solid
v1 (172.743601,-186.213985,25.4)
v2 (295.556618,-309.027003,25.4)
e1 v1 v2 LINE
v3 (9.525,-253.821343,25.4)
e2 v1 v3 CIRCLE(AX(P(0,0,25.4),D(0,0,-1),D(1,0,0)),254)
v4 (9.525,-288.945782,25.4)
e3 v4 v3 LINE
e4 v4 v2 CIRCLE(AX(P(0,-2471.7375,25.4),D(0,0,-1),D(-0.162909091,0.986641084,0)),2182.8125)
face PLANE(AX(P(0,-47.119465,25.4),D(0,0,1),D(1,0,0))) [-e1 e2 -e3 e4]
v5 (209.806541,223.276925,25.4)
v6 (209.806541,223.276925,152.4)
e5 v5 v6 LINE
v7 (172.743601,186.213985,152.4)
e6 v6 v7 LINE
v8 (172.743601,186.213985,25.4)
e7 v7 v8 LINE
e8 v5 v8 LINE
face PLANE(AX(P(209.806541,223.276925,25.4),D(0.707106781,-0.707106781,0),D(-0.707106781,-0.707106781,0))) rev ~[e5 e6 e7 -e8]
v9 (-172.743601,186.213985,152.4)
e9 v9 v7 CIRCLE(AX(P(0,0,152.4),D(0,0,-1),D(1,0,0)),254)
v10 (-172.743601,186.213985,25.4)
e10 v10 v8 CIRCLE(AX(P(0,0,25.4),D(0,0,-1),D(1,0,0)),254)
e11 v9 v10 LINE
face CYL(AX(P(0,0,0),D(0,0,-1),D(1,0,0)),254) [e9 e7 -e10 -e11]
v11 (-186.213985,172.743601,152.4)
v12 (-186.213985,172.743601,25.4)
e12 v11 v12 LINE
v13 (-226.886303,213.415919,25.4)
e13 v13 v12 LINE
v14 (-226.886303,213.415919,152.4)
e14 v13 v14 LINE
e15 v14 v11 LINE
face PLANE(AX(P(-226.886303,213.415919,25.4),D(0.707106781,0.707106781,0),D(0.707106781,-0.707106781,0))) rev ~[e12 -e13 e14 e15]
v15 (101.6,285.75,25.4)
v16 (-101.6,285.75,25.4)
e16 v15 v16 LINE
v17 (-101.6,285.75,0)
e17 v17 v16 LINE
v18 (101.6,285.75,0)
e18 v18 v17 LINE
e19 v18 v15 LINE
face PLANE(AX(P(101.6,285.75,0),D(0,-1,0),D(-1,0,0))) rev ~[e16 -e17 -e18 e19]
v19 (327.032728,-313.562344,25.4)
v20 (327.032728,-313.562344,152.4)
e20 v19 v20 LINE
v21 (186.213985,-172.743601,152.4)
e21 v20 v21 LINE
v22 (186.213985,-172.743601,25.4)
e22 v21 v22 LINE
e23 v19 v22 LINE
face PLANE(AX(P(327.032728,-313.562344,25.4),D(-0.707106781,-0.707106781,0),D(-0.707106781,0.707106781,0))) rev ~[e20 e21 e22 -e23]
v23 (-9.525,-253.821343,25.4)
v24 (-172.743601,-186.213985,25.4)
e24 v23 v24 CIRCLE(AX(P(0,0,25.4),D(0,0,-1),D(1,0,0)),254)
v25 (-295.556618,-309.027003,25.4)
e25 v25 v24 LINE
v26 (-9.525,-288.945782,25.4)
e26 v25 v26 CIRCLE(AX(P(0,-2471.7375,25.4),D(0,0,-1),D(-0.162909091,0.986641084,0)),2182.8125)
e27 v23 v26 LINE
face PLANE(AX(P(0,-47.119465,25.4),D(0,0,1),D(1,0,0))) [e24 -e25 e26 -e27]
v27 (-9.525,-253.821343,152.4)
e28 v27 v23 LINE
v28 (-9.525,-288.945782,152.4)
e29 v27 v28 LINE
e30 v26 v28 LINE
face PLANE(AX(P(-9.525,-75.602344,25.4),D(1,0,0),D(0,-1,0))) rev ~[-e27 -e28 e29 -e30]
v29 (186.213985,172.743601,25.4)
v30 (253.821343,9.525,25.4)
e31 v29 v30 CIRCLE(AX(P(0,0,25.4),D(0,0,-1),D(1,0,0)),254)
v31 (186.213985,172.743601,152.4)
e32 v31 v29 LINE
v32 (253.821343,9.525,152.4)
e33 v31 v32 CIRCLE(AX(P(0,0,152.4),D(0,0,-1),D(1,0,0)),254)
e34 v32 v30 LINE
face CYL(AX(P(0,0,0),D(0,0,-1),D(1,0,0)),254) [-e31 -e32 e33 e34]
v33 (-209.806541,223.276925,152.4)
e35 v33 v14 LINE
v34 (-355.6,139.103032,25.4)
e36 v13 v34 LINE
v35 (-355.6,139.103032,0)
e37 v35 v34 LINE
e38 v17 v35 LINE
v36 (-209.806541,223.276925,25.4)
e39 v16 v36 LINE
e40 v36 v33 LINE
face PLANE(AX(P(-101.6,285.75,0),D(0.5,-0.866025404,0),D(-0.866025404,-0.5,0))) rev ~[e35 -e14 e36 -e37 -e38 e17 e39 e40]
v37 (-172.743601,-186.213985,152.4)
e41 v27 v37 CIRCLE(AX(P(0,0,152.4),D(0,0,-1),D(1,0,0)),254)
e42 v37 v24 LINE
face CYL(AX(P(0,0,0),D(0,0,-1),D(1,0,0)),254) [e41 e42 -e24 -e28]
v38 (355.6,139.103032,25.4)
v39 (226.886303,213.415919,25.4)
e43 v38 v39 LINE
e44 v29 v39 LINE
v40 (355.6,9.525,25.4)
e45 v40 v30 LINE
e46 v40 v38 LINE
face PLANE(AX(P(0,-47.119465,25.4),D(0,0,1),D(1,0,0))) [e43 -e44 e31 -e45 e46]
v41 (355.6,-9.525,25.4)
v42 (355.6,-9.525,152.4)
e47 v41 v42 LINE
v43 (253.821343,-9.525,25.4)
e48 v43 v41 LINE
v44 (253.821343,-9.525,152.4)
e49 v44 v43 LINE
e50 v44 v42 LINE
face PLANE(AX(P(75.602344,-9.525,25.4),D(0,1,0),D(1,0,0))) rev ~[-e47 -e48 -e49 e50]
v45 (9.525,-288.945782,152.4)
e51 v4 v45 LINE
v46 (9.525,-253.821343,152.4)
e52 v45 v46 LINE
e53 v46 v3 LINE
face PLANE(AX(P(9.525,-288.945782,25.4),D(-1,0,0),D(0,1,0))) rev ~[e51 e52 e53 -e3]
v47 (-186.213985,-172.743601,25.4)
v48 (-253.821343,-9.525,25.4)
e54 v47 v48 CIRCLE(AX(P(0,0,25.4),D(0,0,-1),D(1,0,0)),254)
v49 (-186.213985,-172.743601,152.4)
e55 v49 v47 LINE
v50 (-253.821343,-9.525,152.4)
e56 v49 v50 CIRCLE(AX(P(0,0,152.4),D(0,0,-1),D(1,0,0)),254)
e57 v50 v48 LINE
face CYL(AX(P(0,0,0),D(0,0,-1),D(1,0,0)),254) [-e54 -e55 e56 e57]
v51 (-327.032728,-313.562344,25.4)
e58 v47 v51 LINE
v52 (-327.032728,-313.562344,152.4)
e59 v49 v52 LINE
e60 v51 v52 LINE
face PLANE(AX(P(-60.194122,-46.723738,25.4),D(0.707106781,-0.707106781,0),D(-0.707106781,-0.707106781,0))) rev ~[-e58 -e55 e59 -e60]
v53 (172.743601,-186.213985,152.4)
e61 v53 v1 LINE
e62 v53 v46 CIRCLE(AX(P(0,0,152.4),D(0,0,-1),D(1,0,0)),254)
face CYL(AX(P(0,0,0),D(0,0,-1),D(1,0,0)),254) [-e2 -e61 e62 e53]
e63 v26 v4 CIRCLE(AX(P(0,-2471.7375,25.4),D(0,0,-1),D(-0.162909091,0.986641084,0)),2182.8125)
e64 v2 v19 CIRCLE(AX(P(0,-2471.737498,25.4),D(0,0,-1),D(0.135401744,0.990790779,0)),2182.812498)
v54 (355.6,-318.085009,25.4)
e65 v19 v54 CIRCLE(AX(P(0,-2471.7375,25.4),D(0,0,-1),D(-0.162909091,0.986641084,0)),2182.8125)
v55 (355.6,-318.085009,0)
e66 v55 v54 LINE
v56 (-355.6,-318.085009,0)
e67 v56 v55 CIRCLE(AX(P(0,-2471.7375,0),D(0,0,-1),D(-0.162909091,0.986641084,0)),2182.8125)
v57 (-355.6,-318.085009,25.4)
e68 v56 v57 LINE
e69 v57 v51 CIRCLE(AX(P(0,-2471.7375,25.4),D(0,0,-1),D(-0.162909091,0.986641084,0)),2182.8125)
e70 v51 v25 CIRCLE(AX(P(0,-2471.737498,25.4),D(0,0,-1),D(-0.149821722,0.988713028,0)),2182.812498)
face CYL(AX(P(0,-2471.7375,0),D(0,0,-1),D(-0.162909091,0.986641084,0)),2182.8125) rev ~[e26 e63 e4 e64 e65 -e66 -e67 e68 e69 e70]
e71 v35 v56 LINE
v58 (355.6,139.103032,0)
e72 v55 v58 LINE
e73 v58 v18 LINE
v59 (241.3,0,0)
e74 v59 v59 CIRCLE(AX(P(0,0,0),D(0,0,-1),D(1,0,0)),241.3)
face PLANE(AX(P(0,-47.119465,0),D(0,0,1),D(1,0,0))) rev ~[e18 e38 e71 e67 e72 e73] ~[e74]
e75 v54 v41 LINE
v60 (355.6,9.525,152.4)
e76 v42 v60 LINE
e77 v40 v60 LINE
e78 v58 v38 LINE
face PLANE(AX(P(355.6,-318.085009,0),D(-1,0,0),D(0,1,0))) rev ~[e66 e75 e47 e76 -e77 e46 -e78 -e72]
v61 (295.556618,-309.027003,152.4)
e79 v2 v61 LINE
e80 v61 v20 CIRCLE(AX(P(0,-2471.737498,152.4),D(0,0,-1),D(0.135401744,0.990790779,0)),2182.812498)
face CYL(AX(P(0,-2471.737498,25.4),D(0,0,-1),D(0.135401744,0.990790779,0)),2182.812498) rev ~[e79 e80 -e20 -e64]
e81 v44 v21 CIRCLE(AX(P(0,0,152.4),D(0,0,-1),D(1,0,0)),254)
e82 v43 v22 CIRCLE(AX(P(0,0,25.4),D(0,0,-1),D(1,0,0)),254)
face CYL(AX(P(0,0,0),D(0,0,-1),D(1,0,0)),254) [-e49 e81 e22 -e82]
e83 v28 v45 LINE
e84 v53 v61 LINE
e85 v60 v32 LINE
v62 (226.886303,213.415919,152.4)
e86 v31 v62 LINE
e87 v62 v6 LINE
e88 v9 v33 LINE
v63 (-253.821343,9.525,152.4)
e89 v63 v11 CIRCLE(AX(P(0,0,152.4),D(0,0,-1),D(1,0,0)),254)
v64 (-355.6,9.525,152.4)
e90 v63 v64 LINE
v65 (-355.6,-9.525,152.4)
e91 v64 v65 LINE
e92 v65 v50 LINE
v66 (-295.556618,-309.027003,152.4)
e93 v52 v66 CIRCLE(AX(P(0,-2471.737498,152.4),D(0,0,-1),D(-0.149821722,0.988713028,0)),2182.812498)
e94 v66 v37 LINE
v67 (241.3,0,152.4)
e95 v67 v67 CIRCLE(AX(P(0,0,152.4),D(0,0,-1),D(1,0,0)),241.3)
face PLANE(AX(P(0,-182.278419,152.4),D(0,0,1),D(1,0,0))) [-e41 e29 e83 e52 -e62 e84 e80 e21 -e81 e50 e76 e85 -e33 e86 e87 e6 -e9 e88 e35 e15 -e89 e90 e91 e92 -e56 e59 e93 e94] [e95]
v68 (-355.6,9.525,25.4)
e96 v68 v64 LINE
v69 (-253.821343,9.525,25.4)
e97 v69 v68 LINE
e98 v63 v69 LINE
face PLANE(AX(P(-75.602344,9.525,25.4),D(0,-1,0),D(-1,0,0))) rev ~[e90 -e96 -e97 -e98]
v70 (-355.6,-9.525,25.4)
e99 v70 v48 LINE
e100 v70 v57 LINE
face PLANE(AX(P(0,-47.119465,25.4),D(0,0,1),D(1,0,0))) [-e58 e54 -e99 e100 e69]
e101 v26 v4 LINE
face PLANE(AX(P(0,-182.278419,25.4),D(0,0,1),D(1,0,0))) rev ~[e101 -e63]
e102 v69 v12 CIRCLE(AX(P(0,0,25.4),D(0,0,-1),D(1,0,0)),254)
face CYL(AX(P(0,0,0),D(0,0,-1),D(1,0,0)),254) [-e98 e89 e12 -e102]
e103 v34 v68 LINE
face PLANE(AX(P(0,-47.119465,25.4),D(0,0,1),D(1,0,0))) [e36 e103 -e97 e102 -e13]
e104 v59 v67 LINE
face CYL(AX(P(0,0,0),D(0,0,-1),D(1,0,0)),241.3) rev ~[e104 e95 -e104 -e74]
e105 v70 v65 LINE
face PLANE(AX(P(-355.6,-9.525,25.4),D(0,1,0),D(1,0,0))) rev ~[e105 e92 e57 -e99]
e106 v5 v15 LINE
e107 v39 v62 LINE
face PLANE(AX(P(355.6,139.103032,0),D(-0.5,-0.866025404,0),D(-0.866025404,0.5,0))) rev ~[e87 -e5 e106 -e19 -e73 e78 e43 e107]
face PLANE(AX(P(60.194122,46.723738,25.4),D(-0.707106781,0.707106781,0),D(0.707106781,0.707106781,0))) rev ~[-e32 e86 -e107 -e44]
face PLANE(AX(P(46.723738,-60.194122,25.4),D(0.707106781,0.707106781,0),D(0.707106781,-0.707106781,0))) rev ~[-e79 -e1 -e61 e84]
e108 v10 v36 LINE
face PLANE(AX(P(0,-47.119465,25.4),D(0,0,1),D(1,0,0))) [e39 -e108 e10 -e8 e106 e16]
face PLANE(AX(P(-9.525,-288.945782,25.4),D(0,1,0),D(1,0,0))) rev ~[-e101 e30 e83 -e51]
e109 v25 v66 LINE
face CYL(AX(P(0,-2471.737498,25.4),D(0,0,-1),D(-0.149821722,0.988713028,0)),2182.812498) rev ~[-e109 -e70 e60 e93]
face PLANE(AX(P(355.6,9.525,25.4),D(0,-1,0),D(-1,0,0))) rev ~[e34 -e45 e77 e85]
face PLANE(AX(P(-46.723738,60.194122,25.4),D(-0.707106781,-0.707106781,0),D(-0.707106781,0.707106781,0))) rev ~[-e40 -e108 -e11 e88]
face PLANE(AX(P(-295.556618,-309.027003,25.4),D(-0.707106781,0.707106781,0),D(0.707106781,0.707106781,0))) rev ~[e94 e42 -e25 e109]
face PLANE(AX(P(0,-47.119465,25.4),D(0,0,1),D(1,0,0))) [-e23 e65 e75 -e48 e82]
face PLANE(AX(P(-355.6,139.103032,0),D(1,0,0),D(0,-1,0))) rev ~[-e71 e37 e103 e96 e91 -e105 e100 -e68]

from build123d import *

# Parameters (mm, degrees)
F1_DEPTH = 25.4
F3_DEPTH = 127
F4_R     = 254
F5_DEPTH = 152.4
F6_R     = 241.3
F7_DEPTH = 152.4


with BuildPart() as f1:
    # F0 (on Top) → F1 (new body)
    with BuildSketch(Plane.XY):
        with BuildLine():
            Line((-355.6, 139.1030316258), (-355.6, -318.0850094258))
            ThreePointArc((-355.6, -318.0850094258), (0, -288.925), (355.6, -318.0850094258))
            Line((355.6, -318.0850094258), (355.6, 139.1030316258))
            Line((355.6, 139.1030316258), (101.6, 285.75))
            Line((101.6, 285.75), (-101.6, 285.75))
            Line((-101.6, 285.75), (-355.6, 139.1030316258))
        make_face()
    extrude(amount=F1_DEPTH)

    # F2 (on face) → F3 (join)
    with BuildSketch(Plane.XY.offset(25.4)):
        with BuildLine():
            Line((-209.8065405207, 223.2769247023), (-226.8863032655, 213.4159190839))
            Line((-226.8863032655, 213.4159190839), (-60.1941220043, 46.7237378227))
            ThreePointArc((-60.1941220043, 46.7237378227), (-53.8815367264, 53.8815367264), (-46.7237378227, 60.1941220043))
            Line((-46.7237378227, 60.1941220043), (-209.8065405207, 223.2769247023))
        make_face()
        with BuildLine():
            Line((-60.1941220043, -46.7237378227), (-327.0327279417, -313.5623437601))
            ThreePointArc((-327.0327279417, -313.5623437601), (-311.302932669, -311.2373508984), (-295.5566184449, -309.0270026265))
            Line((-295.5566184449, -309.0270026265), (-46.7237378227, -60.1941220043))
            ThreePointArc((-46.7237378227, -60.1941220043), (-53.8815367264, -53.8815367264), (-60.1941220043, -46.7237378227))
        make_face()
        with BuildLine():
            Line((-75.6023437137, 9.525), (-355.6, 9.525))
            Line((-355.6, 9.525), (-355.6, -9.525))
            Line((-355.6, -9.525), (-75.6023437137, -9.525))
            ThreePointArc((-75.6023437137, -9.525), (-76.2, 0), (-75.6023437137, 9.525))
        make_face()
        with BuildLine():
            Line((226.8863032655, 213.4159190839), (209.8065405207, 223.2769247023))
            Line((209.8065405207, 223.2769247023), (46.7237378227, 60.1941220043))
            ThreePointArc((46.7237378227, 60.1941220043), (53.8815367264, 53.8815367264), (60.1941220043, 46.7237378227))
            Line((60.1941220043, 46.7237378227), (226.8863032655, 213.4159190839))
        make_face()
        with BuildLine():
            Line((355.6, -9.525), (355.6, 9.525))
            Line((355.6, 9.525), (75.6023437137, 9.525))
            ThreePointArc((75.6023437137, 9.525), (76.2, 0), (75.6023437137, -9.525))
            Line((75.6023437137, -9.525), (355.6, -9.525))
        make_face()
        with BuildLine():
            Line((46.7237378227, -60.1941220043), (295.5566184449, -309.0270026265))
            ThreePointArc((295.5566184449, -309.0270026265), (311.302932669, -311.2373508984), (327.0327279417, -313.5623437601))
            Line((327.0327279417, -313.5623437601), (60.1941220043, -46.7237378227))
            ThreePointArc((60.1941220043, -46.7237378227), (53.8815367264, -53.8815367264), (46.7237378227, -60.1941220043))
        make_face()
        with BuildLine():
            Line((-9.525, -75.6023437137), (-9.525, -288.9457819171))
            Line((-9.525, -288.9457819171), (9.525, -288.9457819171))
            Line((9.525, -288.9457819171), (9.525, -75.6023437137))
            ThreePointArc((9.525, -75.6023437137), (0, -76.2), (-9.525, -75.6023437137))
        make_face()
    extrude(amount=F3_DEPTH)

    # F4 (on face) → F5 (join, through all)
    with BuildSketch(Plane(origin=(0, 0, 0), x_dir=(1, 0, 0), z_dir=(0, 0, -1))):
        Circle(F4_R)
    extrude(amount=-F5_DEPTH)

    # F6 (on face) → F7 (cut, through all)
    with BuildSketch(Plane(origin=(0, 0, 0), x_dir=(1, 0, 0), z_dir=(0, 0, -1))):
        Circle(F6_R)
    extrude(amount=-F7_DEPTH, mode=Mode.SUBTRACT)


solid = f1.part
